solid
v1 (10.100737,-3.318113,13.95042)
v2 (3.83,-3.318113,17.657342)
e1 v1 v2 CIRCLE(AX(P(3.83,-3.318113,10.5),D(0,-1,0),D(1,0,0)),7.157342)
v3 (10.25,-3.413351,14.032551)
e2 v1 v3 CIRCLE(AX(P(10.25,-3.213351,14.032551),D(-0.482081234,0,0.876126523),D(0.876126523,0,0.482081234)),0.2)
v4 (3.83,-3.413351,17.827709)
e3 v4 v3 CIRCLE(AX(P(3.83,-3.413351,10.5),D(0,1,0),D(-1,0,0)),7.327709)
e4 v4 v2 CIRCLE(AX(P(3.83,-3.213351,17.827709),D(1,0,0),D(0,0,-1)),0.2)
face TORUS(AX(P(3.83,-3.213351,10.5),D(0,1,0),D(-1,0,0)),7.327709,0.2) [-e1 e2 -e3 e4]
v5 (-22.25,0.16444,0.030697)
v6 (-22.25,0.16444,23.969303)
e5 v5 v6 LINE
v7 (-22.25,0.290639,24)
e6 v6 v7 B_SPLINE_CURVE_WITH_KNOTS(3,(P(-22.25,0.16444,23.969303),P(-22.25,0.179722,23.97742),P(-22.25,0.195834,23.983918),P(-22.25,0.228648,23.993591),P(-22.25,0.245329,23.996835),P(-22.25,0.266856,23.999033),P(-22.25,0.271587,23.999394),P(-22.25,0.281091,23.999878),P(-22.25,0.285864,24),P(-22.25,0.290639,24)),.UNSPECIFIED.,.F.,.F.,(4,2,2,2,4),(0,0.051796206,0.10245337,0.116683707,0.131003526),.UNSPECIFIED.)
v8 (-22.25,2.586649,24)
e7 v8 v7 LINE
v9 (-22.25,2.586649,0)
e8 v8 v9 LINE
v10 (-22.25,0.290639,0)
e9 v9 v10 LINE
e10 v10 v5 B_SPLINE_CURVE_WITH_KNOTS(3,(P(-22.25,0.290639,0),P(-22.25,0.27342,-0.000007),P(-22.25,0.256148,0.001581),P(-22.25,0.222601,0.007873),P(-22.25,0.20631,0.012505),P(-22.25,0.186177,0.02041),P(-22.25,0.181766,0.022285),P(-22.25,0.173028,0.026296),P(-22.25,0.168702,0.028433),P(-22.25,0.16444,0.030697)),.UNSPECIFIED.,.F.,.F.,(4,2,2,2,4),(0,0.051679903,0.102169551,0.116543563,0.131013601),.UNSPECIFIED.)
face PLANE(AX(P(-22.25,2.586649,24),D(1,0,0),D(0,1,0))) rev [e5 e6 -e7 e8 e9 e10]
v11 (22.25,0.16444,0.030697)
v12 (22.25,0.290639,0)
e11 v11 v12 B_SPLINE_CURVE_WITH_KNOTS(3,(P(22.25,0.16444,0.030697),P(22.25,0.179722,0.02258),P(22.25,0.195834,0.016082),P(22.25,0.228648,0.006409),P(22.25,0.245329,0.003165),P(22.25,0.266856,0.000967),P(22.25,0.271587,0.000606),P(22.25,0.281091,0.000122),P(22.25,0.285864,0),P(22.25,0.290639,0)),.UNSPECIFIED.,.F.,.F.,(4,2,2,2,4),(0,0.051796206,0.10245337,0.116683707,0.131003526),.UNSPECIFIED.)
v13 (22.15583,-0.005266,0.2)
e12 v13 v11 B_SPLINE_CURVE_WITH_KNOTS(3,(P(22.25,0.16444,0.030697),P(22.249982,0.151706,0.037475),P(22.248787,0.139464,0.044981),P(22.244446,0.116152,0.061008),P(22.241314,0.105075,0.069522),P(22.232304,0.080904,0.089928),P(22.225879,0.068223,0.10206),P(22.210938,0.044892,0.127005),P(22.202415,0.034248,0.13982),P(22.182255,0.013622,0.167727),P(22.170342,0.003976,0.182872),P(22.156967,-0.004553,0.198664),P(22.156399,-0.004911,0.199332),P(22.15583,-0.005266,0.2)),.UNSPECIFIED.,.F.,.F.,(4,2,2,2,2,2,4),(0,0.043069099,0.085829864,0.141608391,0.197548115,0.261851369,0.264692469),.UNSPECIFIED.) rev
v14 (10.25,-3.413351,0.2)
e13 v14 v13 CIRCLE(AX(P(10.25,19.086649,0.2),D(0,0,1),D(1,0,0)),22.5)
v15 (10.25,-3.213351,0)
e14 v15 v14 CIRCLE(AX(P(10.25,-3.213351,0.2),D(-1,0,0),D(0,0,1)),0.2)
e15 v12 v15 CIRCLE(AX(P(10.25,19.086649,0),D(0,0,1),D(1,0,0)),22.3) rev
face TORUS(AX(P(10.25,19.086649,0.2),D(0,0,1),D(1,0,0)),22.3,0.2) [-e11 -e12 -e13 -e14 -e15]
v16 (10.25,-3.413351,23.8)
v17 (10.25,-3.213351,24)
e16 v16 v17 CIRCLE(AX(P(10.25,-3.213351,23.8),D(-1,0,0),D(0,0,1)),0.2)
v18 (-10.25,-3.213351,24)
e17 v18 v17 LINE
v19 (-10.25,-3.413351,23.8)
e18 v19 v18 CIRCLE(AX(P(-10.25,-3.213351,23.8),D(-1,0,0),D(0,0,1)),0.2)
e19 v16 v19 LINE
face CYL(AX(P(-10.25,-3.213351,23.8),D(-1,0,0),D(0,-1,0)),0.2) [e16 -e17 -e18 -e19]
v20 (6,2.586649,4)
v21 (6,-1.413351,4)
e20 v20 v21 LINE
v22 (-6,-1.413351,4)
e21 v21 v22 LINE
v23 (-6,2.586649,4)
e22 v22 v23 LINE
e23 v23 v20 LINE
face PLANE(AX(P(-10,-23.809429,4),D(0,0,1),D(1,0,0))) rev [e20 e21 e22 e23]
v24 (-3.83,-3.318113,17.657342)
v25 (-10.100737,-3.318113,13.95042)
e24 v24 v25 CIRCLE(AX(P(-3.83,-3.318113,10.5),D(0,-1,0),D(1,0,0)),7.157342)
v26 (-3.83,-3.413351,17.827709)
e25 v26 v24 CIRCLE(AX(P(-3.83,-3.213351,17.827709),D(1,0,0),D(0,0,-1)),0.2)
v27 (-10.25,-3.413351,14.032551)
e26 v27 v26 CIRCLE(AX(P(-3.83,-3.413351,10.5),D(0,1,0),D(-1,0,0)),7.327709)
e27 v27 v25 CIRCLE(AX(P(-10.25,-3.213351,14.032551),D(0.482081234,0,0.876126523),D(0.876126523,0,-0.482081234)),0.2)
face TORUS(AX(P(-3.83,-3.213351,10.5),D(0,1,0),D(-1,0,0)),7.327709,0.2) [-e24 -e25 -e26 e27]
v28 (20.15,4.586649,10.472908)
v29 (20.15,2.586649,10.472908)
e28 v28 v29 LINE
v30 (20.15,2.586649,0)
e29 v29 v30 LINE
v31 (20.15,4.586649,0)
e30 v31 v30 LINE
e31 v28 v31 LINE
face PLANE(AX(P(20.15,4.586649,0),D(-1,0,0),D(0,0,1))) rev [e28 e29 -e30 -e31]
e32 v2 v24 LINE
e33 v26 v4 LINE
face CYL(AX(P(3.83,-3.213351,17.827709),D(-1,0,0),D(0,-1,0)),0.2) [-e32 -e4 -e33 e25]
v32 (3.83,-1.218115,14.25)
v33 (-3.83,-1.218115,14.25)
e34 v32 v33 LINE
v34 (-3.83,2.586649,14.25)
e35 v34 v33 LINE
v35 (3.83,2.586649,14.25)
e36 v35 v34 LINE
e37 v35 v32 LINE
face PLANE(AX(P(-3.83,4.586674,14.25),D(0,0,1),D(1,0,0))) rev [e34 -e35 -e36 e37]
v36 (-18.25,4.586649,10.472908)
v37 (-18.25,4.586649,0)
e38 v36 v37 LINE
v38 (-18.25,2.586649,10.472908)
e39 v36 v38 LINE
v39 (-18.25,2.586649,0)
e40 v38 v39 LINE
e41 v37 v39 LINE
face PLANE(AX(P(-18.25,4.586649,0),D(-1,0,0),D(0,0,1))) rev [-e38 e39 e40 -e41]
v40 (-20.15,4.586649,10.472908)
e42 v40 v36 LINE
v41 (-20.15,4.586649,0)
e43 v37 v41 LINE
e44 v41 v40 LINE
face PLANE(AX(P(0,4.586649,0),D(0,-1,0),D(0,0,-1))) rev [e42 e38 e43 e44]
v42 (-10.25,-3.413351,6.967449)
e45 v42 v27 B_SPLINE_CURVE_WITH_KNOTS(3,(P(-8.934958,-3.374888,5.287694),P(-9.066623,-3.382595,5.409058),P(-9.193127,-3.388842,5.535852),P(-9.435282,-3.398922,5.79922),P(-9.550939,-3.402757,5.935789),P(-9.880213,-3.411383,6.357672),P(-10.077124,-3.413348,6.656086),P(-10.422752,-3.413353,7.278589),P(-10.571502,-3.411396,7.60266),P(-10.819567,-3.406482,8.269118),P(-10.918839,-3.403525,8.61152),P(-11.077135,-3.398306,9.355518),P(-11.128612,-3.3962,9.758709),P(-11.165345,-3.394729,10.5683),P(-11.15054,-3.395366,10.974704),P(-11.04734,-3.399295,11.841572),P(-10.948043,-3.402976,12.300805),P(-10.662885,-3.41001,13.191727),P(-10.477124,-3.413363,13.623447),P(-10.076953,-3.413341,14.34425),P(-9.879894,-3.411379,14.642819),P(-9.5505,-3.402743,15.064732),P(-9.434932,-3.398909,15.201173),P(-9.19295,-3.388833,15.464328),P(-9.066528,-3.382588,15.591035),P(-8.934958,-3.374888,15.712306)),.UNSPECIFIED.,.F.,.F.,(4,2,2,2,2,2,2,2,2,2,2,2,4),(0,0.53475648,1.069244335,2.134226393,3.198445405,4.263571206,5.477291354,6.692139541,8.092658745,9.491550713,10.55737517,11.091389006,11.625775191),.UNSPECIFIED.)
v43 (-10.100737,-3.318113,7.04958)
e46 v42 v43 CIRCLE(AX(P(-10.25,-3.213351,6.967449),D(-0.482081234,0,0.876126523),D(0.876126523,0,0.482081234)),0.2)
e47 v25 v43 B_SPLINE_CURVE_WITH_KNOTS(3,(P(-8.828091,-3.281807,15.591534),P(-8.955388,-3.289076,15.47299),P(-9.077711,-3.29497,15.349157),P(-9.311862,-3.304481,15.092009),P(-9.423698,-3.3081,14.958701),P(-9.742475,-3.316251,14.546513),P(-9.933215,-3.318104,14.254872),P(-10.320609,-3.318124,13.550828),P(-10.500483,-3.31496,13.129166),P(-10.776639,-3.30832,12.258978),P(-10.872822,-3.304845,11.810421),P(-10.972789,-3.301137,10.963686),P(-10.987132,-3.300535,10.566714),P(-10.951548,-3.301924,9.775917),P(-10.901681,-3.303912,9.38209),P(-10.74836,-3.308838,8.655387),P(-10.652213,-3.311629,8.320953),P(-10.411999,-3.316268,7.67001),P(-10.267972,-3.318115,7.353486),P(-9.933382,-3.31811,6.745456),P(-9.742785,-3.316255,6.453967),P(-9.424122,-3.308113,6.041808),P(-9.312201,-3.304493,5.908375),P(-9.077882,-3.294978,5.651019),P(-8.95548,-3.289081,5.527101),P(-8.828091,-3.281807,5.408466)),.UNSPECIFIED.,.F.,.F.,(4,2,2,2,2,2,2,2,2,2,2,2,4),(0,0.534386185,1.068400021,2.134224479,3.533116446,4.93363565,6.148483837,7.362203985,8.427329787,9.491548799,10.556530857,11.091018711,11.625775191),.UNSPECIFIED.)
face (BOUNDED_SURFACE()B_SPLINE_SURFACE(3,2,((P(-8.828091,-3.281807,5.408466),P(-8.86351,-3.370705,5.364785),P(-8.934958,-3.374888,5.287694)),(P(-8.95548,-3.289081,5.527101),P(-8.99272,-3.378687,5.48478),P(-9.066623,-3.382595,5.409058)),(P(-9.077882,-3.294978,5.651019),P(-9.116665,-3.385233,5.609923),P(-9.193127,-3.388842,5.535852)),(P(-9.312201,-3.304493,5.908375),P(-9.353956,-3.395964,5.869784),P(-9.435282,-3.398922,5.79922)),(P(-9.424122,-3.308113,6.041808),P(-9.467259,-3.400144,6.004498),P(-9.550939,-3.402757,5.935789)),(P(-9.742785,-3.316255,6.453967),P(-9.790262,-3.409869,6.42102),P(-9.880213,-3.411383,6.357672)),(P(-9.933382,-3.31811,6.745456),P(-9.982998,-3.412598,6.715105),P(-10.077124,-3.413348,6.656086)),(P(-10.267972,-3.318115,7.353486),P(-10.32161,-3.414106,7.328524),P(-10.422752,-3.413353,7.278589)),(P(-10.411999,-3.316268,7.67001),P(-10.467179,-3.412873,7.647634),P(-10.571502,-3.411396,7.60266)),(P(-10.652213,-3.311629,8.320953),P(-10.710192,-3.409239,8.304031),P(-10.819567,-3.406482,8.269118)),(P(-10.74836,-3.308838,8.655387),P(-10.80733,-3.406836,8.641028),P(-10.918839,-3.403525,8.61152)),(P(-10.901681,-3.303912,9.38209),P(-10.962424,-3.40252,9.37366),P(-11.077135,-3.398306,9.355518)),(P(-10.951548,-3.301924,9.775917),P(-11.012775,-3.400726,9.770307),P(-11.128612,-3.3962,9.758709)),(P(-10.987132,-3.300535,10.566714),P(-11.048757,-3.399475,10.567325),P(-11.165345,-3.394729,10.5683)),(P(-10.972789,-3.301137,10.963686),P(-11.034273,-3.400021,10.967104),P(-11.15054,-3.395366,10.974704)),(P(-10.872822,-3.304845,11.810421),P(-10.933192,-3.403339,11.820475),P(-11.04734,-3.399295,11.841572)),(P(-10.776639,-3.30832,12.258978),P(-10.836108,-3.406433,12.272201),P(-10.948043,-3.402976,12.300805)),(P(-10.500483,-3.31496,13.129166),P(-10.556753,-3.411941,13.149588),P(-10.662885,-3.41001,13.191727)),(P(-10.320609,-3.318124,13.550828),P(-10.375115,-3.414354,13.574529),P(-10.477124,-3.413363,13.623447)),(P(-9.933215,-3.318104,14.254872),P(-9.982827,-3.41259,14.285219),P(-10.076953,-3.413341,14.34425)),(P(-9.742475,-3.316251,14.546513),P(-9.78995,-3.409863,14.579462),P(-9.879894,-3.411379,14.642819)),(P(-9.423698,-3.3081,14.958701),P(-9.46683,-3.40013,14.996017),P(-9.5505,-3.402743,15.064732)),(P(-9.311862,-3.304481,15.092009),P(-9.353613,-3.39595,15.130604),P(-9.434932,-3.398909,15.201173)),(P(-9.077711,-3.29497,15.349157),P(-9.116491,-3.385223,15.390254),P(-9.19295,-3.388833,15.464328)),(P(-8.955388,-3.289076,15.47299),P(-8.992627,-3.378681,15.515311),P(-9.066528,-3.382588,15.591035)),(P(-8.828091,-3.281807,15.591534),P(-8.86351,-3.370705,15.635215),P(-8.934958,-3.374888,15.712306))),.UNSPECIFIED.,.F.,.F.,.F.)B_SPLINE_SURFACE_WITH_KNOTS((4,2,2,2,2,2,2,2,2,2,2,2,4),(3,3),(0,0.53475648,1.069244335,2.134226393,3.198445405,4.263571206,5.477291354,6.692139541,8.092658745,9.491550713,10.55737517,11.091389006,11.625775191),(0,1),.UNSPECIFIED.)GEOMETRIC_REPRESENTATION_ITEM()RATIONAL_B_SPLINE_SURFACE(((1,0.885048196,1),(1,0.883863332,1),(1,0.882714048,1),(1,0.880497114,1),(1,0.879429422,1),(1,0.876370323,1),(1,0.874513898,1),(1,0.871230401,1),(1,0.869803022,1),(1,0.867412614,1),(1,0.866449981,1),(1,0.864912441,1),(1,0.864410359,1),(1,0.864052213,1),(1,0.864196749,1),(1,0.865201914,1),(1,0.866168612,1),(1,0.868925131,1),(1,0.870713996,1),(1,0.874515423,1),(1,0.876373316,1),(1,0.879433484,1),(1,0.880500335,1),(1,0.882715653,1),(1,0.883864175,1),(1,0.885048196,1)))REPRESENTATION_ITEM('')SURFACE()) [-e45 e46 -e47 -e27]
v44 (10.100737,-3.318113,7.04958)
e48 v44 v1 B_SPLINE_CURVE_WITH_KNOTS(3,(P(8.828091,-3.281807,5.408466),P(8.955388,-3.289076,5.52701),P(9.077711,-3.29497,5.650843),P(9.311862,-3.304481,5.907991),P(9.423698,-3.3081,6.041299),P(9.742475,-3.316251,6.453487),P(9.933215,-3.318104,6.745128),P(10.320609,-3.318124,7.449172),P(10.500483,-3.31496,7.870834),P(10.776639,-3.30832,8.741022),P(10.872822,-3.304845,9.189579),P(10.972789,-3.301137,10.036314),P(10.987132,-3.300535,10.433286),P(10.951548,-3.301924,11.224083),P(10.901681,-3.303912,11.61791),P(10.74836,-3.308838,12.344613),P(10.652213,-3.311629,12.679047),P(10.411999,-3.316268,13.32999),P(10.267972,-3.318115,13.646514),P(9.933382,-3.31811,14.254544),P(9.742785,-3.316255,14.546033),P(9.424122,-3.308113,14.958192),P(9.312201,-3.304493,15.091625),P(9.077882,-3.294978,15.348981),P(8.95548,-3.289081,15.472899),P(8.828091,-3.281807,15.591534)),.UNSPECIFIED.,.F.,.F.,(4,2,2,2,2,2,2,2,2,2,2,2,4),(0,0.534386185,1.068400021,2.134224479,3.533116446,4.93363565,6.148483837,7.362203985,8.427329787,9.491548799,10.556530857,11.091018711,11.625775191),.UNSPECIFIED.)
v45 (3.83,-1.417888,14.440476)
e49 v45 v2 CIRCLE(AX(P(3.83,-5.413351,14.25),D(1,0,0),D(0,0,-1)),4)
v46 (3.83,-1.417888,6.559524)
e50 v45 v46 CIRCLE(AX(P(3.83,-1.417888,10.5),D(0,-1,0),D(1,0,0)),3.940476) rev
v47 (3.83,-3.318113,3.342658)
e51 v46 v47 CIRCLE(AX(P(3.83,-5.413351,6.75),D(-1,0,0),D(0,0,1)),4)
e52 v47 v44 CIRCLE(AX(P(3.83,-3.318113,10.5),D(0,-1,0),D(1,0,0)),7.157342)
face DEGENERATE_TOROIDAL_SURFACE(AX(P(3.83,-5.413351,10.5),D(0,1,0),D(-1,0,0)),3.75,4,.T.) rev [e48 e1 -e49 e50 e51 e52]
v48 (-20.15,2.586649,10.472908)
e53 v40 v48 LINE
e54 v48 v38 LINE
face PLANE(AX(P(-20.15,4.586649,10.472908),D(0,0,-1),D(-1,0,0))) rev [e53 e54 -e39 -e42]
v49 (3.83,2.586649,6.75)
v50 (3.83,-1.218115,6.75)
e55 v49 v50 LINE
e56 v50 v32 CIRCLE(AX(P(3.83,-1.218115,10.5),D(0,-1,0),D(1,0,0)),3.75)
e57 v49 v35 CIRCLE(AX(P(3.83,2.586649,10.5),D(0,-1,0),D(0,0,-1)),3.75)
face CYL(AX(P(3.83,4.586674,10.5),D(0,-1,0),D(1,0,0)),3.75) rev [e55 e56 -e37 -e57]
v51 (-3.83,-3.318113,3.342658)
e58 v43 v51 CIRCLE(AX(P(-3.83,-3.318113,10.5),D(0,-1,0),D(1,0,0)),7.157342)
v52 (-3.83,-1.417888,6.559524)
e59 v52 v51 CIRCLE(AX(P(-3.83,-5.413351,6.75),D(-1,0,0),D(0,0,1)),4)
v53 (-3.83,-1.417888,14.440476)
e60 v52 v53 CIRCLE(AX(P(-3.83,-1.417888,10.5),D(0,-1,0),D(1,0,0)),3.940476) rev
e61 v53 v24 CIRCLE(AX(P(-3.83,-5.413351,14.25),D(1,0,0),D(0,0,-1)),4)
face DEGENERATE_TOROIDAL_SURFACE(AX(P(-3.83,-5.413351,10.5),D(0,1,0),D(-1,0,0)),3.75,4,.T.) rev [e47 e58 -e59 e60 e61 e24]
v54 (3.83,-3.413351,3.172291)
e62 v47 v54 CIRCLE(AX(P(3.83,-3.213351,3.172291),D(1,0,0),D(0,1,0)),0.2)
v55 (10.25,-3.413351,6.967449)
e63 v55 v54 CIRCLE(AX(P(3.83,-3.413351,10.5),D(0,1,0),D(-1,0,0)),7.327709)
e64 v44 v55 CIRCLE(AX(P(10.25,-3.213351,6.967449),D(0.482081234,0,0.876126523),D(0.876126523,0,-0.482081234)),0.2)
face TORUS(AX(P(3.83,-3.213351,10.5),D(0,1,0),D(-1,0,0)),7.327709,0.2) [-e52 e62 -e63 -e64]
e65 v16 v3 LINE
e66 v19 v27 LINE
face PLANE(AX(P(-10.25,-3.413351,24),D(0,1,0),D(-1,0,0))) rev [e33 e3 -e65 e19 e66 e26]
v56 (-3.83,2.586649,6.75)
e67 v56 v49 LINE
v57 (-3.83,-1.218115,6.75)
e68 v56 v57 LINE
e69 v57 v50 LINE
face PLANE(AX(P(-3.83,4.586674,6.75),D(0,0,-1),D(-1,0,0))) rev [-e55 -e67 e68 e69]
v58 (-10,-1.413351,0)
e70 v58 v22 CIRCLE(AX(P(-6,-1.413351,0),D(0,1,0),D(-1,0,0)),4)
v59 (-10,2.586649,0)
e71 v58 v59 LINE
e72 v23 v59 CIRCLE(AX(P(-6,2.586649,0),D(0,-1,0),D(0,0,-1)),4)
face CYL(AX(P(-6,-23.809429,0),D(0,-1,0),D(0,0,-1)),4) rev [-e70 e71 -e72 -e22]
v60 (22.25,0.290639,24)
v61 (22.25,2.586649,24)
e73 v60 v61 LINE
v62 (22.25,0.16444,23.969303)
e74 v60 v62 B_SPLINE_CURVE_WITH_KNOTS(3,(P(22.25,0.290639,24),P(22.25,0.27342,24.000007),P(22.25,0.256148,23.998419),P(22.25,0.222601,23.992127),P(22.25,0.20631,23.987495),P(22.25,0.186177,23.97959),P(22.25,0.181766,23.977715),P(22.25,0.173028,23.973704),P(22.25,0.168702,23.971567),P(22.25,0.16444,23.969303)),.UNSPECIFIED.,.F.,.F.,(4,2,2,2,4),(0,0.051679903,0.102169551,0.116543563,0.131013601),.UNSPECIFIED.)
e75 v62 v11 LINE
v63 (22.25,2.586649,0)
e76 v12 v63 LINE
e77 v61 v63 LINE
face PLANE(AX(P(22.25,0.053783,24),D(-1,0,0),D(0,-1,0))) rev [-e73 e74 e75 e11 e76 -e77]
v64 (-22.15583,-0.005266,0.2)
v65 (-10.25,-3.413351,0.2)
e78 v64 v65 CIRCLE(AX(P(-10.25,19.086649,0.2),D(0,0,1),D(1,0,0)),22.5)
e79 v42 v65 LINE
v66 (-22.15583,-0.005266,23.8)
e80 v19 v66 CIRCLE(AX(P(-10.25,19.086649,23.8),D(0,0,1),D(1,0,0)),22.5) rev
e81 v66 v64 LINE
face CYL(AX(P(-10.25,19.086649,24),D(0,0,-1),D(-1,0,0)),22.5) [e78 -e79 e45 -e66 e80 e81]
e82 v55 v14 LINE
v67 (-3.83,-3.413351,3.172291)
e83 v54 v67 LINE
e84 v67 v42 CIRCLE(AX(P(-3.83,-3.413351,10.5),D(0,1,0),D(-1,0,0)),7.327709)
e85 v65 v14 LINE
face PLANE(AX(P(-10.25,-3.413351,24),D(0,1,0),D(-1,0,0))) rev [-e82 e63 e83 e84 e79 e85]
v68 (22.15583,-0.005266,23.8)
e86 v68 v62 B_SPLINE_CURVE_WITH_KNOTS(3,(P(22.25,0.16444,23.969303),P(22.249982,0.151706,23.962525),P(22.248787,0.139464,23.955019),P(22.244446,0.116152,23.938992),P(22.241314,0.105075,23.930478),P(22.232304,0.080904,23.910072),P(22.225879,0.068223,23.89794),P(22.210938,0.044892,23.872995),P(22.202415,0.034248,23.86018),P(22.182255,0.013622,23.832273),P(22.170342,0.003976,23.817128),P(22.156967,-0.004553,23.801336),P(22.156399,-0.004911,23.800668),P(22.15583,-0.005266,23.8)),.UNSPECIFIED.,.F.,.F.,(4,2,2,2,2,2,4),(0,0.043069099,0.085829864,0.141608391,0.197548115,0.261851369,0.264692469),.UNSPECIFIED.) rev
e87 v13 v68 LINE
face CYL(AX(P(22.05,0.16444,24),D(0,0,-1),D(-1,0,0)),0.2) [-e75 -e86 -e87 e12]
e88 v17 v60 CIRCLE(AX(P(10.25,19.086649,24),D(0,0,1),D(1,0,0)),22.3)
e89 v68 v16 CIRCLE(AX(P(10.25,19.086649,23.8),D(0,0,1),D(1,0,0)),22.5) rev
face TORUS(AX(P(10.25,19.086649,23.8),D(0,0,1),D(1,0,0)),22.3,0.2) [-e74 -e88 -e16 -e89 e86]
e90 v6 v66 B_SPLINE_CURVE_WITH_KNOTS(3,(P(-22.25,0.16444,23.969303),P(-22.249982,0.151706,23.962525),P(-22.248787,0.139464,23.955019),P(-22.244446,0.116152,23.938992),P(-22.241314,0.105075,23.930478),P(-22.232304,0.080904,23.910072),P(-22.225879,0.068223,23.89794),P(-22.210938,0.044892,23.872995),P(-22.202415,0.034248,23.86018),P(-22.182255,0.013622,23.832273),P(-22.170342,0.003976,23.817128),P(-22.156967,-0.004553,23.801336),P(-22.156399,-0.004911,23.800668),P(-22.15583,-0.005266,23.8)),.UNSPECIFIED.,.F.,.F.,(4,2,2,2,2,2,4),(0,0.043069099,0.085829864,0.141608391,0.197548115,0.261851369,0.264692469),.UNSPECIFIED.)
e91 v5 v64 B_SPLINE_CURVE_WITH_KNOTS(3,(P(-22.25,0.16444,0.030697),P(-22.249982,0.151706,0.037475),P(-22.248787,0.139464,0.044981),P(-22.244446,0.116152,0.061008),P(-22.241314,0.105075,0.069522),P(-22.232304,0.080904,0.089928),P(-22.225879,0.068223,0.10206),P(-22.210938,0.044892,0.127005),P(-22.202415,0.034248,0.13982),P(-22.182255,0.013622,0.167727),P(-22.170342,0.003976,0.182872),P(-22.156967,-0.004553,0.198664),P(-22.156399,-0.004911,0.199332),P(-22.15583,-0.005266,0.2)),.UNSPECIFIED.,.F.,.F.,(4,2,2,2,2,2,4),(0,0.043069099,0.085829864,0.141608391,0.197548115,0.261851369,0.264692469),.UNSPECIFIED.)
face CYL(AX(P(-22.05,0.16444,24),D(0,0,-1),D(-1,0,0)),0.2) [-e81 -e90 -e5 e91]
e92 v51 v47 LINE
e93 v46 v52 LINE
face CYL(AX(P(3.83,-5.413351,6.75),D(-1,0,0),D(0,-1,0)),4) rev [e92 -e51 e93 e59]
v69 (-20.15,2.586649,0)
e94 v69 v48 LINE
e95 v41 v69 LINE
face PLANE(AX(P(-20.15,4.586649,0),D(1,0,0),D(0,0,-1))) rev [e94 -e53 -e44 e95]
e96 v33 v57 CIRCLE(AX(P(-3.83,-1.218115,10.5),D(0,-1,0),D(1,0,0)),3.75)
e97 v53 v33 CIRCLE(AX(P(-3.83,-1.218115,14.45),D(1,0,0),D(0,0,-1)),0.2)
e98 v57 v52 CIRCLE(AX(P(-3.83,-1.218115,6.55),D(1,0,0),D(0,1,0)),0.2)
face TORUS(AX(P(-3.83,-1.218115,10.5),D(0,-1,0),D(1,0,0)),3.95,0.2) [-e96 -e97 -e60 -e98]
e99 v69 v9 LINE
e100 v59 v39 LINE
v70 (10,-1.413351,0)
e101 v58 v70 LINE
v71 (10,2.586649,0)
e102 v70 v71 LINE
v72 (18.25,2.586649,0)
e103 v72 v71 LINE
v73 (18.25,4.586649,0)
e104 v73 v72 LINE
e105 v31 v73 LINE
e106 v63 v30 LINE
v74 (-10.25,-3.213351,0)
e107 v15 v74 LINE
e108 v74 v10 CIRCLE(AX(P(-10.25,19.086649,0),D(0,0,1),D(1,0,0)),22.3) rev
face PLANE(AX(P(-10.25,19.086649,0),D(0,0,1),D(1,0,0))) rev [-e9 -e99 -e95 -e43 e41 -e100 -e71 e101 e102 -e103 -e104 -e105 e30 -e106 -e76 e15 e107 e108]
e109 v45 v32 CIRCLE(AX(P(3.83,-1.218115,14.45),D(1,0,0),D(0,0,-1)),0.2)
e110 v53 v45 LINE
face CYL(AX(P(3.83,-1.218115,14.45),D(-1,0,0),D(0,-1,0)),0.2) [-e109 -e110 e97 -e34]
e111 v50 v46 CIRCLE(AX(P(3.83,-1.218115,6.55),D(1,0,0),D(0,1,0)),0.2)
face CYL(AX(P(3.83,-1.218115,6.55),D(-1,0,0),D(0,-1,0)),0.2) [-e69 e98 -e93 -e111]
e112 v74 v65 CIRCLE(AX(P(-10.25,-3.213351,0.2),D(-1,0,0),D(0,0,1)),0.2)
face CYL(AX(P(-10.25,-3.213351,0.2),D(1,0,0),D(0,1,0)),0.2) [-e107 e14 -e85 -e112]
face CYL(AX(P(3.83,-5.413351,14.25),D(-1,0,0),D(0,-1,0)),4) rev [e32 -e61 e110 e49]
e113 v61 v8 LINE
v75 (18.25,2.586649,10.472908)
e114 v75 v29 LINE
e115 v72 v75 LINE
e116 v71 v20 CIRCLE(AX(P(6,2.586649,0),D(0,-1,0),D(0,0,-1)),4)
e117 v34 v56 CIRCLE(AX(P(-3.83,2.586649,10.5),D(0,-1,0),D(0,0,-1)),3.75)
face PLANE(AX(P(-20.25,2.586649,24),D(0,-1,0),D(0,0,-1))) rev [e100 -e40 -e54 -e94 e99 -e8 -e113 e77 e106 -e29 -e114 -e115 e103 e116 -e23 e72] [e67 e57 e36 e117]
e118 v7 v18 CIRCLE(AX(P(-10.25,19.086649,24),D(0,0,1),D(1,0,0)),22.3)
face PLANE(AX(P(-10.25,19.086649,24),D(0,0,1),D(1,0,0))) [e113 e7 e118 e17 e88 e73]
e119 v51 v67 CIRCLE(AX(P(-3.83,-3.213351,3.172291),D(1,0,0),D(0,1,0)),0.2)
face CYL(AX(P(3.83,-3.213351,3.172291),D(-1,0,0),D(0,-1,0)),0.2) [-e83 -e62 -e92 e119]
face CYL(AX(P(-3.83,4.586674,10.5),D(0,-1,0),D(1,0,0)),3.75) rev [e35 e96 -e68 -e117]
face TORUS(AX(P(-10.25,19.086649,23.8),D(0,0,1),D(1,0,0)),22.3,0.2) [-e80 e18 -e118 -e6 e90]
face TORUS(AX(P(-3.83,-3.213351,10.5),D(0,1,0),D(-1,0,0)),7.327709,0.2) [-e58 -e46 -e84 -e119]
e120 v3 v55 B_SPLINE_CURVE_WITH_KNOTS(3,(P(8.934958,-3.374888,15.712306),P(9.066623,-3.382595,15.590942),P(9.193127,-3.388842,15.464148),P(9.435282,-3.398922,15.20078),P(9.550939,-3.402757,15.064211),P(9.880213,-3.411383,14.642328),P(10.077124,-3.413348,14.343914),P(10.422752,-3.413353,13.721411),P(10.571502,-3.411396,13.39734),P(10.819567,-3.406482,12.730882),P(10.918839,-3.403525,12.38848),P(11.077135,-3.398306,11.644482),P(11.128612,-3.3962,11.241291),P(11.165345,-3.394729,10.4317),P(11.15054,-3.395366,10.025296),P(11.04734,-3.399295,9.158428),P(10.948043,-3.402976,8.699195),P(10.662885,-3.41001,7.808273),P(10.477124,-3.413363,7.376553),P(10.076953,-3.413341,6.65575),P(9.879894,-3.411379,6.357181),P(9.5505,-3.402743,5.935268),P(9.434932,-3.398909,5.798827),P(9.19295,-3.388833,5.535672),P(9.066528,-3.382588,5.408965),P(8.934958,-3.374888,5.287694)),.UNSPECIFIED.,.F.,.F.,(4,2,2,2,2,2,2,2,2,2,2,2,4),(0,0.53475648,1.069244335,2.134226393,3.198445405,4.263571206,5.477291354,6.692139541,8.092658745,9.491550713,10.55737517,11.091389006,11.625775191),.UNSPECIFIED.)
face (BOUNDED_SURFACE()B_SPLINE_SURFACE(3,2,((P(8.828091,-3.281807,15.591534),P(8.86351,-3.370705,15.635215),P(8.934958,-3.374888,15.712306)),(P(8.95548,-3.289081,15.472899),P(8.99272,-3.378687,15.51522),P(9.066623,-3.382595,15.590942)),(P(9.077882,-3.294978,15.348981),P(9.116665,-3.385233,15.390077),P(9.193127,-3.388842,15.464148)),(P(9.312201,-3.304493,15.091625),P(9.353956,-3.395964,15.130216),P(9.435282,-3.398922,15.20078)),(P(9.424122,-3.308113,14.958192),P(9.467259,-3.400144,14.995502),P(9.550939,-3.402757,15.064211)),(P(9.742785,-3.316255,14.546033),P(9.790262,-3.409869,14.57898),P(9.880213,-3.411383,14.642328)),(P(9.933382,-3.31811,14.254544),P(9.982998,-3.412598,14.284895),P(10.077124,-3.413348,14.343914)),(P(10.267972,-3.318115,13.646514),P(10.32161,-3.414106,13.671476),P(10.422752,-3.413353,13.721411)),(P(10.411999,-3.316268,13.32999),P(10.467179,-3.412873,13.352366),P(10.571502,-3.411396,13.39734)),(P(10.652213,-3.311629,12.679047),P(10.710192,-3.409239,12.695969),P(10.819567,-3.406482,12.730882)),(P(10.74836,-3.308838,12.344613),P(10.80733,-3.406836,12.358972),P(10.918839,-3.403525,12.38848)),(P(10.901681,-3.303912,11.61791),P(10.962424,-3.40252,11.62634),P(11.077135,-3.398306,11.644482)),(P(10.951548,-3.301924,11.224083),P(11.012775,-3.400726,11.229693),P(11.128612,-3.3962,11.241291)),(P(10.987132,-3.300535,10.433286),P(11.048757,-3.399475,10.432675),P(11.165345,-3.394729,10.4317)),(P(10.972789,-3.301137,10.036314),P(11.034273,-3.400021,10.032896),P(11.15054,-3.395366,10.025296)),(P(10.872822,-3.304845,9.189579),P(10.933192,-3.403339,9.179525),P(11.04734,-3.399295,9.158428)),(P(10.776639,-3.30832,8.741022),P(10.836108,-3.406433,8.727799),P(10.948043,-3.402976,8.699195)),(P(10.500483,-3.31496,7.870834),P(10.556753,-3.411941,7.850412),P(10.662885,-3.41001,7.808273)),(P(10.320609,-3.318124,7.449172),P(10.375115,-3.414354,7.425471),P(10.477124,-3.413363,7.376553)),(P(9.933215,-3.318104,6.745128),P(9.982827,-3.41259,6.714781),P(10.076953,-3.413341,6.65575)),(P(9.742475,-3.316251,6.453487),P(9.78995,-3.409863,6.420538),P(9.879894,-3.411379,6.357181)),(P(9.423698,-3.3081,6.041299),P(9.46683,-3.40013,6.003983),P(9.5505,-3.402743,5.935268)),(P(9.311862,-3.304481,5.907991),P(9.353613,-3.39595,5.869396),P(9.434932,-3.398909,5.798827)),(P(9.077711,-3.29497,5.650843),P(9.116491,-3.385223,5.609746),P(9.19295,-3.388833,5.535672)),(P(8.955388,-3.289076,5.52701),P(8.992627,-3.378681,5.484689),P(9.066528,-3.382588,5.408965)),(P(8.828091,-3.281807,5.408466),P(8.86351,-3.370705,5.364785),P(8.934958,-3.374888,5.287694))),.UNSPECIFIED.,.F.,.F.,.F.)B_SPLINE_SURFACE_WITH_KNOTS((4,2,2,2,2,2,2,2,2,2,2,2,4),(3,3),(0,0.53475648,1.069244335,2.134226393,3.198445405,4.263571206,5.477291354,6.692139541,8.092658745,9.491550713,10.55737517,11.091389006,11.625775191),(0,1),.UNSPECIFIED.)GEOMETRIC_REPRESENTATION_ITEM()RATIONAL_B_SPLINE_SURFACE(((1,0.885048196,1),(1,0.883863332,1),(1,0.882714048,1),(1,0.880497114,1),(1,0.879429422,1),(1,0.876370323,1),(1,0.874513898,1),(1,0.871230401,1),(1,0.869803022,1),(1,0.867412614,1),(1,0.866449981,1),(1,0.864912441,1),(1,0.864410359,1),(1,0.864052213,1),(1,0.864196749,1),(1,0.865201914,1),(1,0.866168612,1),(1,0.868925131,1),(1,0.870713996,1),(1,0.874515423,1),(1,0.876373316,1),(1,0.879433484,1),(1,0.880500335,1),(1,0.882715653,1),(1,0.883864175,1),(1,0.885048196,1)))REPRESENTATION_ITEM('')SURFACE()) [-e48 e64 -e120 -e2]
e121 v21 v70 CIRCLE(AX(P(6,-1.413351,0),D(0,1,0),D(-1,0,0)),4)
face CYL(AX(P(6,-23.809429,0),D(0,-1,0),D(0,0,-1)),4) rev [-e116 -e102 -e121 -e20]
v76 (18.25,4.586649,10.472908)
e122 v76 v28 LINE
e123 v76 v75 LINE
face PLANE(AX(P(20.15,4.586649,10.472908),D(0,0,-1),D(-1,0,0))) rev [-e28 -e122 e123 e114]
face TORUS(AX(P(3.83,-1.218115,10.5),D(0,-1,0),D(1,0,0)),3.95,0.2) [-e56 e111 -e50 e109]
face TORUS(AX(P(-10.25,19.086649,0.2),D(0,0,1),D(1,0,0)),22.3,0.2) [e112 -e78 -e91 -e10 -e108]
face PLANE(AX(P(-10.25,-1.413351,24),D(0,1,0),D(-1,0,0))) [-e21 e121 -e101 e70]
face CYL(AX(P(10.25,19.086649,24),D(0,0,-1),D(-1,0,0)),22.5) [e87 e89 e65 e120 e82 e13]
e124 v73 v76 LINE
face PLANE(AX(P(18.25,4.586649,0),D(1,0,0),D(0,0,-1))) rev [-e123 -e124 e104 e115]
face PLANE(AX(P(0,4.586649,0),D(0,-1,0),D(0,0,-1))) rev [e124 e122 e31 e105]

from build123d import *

# Parameters (mm, degrees)
EXTRUDE_1_DEPTH     = 24
SKETCH_2_W          = 20
SKETCH_2_H          = 4
CUT_EXTRUDE_1_DEPTH = 4
SKETCH_3_W          = 1.9
SKETCH_3_H          = 10.472908188
EXTRUDE_2_DEPTH     = 2
FILLET_1_R          = 4
CUT_EXTRUDE_2_DEPTH = 34.690688625
SWEEP_START         = -3.83
SWEEP_4_3_DEPTH     = 7.66
FILLET_2_R          = 0.2
FILLET_3_R          = 0.2


with BuildPart() as part:
    # Эскиз1 → Бобышка-Вытянуть1 (new body)
    with BuildSketch(Plane.XY):
        with BuildLine():
            Line((-20.25, 2.586649223), (20.25, 2.586649223))
            Line((20.25, 2.586649223), (22.25, 2.586649223))
            Line((22.25, 2.586649223), (22.25, 0.053782912))
            ThreePointArc((22.25, 0.053782912), (16.495418641, -2.529195567), (10.25, -3.413350777))
            Line((10.25, -3.413350777), (-10.25, -3.413350777))
            ThreePointArc((-10.25, -3.413350777), (-16.495418641, -2.529195567), (-22.25, 0.053782912))
            Line((-22.25, 0.053782912), (-22.25, 2.586649223))
            Line((-22.25, 2.586649223), (-20.25, 2.586649223))
        make_face()
    extrude(amount=EXTRUDE_1_DEPTH)

    # Эскиз2 → Вырез-Вытянуть1 (cut)
    with BuildSketch(Plane(origin=(0, 2.586649223, 0), x_dir=(1, 0, 0), z_dir=(0, 1, 0))):
        with Locations((0, -2)):
            Rectangle(SKETCH_2_W, SKETCH_2_H)
    extrude(amount=-CUT_EXTRUDE_1_DEPTH, mode=Mode.SUBTRACT)

    # Эскиз3 → Бобышка-Вытянуть2 (add)
    with BuildSketch(Plane(origin=(0, 2.586649223, 0), x_dir=(1, 0, 0), z_dir=(0, 1, 0))):
        with Locations((19.2, -5.236454094)):
            Rectangle(SKETCH_3_W, SKETCH_3_H)
        with Locations((-19.2, -5.236454094)):
            Rectangle(SKETCH_3_W, SKETCH_3_H)
    extrude(amount=EXTRUDE_2_DEPTH)

    # Скругление1
    fillet_1_edges = [part.edges().sort_by_distance(p)[0] for p in [
        (-10, 0.586649223, 4),
        (10, 0.586649223, 4),
    ]]
    fillet(fillet_1_edges, radius=FILLET_1_R - 0.0001)  # a hair under: the kernel refuses the full size

    # Эскиз4 → Вырез-Вытянуть2 (cut, through all)
    with BuildSketch(Plane.XZ.offset(3.413350777)):
        with BuildLine():
            Line((-3.83, 14.25), (3.83, 14.25))
            ThreePointArc((3.83, 14.25), (7.58, 10.5), (3.83, 6.75))
            Line((3.83, 6.75), (-3.83, 6.75))
            ThreePointArc((-3.83, 6.75), (-7.58, 10.5), (-3.83, 14.25))
        make_face()
    extrude(amount=-CUT_EXTRUDE_2_DEPTH, mode=Mode.SUBTRACT)

    # Вырез-По траектории4: read off the stored shape, not the designer's step
    # Вырез-По траектории4 outline → Вырез-По траектории4 (revolve, cut)
    with BuildSketch(Plane(origin=(3.83, 0, 10.5), x_dir=(1, 0, 0), z_dir=(0, 0, 1))):
        with BuildLine():
            Line((3.75, -3.413351016), (7.214101753, -3.413351016))
            ThreePointArc((7.214101753, -3.413351016), (5.750000119, -1.949249231), (3.75, -1.413350777))
            Line((3.75, -1.413350777), (3.75, -3.413351016))
        make_face()
    revolve(axis=Axis((3.83, 0, 10.5), (0, 1, 0)), mode=Mode.SUBTRACT)

    # Sweep 4 2 outline → Sweep 4 2 (revolve, cut)
    with BuildSketch(Plane(origin=(-3.83, 0, 10.5), x_dir=(1, 0, 0), z_dir=(0, 0, 1))):
        with BuildLine():
            Line((3.75, -3.413350777), (7.214101615, -3.413350777))
            ThreePointArc((7.214101615, -3.413350777), (5.75, -1.949249162), (3.75, -1.413350777))
            Line((3.75, -1.413350777), (3.75, -3.413350777))
        make_face()
    revolve(axis=Axis((-3.83, 0, 10.5), (0, 1, 0)), mode=Mode.SUBTRACT)

    # Sweep 4 3 outline → Sweep 4 3 (cut)
    with BuildSketch(Plane.YZ.offset(SWEEP_START)):
        with BuildLine():
            ThreePointArc((-1.413350777, 14.25), (-1.949249162, 16.25), (-3.413350777, 17.714101615))
            Line((-3.413350777, 17.714101615), (-3.413350777, 3.285898385))
            ThreePointArc((-3.413350777, 3.285898385), (-1.949249162, 4.75), (-1.413350777, 6.75))
            Line((-1.413350777, 6.75), (-1.413350777, 14.25))
        make_face()
    extrude(amount=SWEEP_4_3_DEPTH, mode=Mode.SUBTRACT)

    # Скругление2
    fillet_2_edges = [part.edges().sort_by_distance(p)[0] for p in [
        (0, -1.413350777, 14.25),
        (0, -1.413350777, 6.75),
        (-7.58, -1.413350777, 10.5),
        (-11.036133766, -3.39961311, 10.500000042),
        (-7.592036663, -3.413350777, 16.65551316),
        (-7.592036663, -3.413350777, 4.34448684),
        (0, -3.413350777, 3.285898385),
        (6.481650429, -1.413350777, 13.151650429),
        (7.59203662, -3.413351016, 16.655513348),
        (10.838298925, -3.40565846, 12.191976989),
        (7.59203662, -3.413351016, 4.344486652),
        (0, -3.413350777, 17.714101615),
    ]]
    fillet(fillet_2_edges, radius=FILLET_2_R)

    # Скругление3
    fillet_3_edges = [part.edges().sort_by_distance(p)[0] for p in [
        (-16.495418641, -2.529195567, 24),
        (0, -3.413350777, 24),
        (22.25, 0.053782912, 12),
        (-22.25, 0.053782912, 12),
        (16.495418641, -2.529195567, 24),
        (16.495418641, -2.529195567, 0),
        (0, -3.413350777, 0),
        (-16.495418641, -2.529195567, 0),
    ]]
    fillet(fillet_3_edges, radius=FILLET_3_R)


solid = part.part
